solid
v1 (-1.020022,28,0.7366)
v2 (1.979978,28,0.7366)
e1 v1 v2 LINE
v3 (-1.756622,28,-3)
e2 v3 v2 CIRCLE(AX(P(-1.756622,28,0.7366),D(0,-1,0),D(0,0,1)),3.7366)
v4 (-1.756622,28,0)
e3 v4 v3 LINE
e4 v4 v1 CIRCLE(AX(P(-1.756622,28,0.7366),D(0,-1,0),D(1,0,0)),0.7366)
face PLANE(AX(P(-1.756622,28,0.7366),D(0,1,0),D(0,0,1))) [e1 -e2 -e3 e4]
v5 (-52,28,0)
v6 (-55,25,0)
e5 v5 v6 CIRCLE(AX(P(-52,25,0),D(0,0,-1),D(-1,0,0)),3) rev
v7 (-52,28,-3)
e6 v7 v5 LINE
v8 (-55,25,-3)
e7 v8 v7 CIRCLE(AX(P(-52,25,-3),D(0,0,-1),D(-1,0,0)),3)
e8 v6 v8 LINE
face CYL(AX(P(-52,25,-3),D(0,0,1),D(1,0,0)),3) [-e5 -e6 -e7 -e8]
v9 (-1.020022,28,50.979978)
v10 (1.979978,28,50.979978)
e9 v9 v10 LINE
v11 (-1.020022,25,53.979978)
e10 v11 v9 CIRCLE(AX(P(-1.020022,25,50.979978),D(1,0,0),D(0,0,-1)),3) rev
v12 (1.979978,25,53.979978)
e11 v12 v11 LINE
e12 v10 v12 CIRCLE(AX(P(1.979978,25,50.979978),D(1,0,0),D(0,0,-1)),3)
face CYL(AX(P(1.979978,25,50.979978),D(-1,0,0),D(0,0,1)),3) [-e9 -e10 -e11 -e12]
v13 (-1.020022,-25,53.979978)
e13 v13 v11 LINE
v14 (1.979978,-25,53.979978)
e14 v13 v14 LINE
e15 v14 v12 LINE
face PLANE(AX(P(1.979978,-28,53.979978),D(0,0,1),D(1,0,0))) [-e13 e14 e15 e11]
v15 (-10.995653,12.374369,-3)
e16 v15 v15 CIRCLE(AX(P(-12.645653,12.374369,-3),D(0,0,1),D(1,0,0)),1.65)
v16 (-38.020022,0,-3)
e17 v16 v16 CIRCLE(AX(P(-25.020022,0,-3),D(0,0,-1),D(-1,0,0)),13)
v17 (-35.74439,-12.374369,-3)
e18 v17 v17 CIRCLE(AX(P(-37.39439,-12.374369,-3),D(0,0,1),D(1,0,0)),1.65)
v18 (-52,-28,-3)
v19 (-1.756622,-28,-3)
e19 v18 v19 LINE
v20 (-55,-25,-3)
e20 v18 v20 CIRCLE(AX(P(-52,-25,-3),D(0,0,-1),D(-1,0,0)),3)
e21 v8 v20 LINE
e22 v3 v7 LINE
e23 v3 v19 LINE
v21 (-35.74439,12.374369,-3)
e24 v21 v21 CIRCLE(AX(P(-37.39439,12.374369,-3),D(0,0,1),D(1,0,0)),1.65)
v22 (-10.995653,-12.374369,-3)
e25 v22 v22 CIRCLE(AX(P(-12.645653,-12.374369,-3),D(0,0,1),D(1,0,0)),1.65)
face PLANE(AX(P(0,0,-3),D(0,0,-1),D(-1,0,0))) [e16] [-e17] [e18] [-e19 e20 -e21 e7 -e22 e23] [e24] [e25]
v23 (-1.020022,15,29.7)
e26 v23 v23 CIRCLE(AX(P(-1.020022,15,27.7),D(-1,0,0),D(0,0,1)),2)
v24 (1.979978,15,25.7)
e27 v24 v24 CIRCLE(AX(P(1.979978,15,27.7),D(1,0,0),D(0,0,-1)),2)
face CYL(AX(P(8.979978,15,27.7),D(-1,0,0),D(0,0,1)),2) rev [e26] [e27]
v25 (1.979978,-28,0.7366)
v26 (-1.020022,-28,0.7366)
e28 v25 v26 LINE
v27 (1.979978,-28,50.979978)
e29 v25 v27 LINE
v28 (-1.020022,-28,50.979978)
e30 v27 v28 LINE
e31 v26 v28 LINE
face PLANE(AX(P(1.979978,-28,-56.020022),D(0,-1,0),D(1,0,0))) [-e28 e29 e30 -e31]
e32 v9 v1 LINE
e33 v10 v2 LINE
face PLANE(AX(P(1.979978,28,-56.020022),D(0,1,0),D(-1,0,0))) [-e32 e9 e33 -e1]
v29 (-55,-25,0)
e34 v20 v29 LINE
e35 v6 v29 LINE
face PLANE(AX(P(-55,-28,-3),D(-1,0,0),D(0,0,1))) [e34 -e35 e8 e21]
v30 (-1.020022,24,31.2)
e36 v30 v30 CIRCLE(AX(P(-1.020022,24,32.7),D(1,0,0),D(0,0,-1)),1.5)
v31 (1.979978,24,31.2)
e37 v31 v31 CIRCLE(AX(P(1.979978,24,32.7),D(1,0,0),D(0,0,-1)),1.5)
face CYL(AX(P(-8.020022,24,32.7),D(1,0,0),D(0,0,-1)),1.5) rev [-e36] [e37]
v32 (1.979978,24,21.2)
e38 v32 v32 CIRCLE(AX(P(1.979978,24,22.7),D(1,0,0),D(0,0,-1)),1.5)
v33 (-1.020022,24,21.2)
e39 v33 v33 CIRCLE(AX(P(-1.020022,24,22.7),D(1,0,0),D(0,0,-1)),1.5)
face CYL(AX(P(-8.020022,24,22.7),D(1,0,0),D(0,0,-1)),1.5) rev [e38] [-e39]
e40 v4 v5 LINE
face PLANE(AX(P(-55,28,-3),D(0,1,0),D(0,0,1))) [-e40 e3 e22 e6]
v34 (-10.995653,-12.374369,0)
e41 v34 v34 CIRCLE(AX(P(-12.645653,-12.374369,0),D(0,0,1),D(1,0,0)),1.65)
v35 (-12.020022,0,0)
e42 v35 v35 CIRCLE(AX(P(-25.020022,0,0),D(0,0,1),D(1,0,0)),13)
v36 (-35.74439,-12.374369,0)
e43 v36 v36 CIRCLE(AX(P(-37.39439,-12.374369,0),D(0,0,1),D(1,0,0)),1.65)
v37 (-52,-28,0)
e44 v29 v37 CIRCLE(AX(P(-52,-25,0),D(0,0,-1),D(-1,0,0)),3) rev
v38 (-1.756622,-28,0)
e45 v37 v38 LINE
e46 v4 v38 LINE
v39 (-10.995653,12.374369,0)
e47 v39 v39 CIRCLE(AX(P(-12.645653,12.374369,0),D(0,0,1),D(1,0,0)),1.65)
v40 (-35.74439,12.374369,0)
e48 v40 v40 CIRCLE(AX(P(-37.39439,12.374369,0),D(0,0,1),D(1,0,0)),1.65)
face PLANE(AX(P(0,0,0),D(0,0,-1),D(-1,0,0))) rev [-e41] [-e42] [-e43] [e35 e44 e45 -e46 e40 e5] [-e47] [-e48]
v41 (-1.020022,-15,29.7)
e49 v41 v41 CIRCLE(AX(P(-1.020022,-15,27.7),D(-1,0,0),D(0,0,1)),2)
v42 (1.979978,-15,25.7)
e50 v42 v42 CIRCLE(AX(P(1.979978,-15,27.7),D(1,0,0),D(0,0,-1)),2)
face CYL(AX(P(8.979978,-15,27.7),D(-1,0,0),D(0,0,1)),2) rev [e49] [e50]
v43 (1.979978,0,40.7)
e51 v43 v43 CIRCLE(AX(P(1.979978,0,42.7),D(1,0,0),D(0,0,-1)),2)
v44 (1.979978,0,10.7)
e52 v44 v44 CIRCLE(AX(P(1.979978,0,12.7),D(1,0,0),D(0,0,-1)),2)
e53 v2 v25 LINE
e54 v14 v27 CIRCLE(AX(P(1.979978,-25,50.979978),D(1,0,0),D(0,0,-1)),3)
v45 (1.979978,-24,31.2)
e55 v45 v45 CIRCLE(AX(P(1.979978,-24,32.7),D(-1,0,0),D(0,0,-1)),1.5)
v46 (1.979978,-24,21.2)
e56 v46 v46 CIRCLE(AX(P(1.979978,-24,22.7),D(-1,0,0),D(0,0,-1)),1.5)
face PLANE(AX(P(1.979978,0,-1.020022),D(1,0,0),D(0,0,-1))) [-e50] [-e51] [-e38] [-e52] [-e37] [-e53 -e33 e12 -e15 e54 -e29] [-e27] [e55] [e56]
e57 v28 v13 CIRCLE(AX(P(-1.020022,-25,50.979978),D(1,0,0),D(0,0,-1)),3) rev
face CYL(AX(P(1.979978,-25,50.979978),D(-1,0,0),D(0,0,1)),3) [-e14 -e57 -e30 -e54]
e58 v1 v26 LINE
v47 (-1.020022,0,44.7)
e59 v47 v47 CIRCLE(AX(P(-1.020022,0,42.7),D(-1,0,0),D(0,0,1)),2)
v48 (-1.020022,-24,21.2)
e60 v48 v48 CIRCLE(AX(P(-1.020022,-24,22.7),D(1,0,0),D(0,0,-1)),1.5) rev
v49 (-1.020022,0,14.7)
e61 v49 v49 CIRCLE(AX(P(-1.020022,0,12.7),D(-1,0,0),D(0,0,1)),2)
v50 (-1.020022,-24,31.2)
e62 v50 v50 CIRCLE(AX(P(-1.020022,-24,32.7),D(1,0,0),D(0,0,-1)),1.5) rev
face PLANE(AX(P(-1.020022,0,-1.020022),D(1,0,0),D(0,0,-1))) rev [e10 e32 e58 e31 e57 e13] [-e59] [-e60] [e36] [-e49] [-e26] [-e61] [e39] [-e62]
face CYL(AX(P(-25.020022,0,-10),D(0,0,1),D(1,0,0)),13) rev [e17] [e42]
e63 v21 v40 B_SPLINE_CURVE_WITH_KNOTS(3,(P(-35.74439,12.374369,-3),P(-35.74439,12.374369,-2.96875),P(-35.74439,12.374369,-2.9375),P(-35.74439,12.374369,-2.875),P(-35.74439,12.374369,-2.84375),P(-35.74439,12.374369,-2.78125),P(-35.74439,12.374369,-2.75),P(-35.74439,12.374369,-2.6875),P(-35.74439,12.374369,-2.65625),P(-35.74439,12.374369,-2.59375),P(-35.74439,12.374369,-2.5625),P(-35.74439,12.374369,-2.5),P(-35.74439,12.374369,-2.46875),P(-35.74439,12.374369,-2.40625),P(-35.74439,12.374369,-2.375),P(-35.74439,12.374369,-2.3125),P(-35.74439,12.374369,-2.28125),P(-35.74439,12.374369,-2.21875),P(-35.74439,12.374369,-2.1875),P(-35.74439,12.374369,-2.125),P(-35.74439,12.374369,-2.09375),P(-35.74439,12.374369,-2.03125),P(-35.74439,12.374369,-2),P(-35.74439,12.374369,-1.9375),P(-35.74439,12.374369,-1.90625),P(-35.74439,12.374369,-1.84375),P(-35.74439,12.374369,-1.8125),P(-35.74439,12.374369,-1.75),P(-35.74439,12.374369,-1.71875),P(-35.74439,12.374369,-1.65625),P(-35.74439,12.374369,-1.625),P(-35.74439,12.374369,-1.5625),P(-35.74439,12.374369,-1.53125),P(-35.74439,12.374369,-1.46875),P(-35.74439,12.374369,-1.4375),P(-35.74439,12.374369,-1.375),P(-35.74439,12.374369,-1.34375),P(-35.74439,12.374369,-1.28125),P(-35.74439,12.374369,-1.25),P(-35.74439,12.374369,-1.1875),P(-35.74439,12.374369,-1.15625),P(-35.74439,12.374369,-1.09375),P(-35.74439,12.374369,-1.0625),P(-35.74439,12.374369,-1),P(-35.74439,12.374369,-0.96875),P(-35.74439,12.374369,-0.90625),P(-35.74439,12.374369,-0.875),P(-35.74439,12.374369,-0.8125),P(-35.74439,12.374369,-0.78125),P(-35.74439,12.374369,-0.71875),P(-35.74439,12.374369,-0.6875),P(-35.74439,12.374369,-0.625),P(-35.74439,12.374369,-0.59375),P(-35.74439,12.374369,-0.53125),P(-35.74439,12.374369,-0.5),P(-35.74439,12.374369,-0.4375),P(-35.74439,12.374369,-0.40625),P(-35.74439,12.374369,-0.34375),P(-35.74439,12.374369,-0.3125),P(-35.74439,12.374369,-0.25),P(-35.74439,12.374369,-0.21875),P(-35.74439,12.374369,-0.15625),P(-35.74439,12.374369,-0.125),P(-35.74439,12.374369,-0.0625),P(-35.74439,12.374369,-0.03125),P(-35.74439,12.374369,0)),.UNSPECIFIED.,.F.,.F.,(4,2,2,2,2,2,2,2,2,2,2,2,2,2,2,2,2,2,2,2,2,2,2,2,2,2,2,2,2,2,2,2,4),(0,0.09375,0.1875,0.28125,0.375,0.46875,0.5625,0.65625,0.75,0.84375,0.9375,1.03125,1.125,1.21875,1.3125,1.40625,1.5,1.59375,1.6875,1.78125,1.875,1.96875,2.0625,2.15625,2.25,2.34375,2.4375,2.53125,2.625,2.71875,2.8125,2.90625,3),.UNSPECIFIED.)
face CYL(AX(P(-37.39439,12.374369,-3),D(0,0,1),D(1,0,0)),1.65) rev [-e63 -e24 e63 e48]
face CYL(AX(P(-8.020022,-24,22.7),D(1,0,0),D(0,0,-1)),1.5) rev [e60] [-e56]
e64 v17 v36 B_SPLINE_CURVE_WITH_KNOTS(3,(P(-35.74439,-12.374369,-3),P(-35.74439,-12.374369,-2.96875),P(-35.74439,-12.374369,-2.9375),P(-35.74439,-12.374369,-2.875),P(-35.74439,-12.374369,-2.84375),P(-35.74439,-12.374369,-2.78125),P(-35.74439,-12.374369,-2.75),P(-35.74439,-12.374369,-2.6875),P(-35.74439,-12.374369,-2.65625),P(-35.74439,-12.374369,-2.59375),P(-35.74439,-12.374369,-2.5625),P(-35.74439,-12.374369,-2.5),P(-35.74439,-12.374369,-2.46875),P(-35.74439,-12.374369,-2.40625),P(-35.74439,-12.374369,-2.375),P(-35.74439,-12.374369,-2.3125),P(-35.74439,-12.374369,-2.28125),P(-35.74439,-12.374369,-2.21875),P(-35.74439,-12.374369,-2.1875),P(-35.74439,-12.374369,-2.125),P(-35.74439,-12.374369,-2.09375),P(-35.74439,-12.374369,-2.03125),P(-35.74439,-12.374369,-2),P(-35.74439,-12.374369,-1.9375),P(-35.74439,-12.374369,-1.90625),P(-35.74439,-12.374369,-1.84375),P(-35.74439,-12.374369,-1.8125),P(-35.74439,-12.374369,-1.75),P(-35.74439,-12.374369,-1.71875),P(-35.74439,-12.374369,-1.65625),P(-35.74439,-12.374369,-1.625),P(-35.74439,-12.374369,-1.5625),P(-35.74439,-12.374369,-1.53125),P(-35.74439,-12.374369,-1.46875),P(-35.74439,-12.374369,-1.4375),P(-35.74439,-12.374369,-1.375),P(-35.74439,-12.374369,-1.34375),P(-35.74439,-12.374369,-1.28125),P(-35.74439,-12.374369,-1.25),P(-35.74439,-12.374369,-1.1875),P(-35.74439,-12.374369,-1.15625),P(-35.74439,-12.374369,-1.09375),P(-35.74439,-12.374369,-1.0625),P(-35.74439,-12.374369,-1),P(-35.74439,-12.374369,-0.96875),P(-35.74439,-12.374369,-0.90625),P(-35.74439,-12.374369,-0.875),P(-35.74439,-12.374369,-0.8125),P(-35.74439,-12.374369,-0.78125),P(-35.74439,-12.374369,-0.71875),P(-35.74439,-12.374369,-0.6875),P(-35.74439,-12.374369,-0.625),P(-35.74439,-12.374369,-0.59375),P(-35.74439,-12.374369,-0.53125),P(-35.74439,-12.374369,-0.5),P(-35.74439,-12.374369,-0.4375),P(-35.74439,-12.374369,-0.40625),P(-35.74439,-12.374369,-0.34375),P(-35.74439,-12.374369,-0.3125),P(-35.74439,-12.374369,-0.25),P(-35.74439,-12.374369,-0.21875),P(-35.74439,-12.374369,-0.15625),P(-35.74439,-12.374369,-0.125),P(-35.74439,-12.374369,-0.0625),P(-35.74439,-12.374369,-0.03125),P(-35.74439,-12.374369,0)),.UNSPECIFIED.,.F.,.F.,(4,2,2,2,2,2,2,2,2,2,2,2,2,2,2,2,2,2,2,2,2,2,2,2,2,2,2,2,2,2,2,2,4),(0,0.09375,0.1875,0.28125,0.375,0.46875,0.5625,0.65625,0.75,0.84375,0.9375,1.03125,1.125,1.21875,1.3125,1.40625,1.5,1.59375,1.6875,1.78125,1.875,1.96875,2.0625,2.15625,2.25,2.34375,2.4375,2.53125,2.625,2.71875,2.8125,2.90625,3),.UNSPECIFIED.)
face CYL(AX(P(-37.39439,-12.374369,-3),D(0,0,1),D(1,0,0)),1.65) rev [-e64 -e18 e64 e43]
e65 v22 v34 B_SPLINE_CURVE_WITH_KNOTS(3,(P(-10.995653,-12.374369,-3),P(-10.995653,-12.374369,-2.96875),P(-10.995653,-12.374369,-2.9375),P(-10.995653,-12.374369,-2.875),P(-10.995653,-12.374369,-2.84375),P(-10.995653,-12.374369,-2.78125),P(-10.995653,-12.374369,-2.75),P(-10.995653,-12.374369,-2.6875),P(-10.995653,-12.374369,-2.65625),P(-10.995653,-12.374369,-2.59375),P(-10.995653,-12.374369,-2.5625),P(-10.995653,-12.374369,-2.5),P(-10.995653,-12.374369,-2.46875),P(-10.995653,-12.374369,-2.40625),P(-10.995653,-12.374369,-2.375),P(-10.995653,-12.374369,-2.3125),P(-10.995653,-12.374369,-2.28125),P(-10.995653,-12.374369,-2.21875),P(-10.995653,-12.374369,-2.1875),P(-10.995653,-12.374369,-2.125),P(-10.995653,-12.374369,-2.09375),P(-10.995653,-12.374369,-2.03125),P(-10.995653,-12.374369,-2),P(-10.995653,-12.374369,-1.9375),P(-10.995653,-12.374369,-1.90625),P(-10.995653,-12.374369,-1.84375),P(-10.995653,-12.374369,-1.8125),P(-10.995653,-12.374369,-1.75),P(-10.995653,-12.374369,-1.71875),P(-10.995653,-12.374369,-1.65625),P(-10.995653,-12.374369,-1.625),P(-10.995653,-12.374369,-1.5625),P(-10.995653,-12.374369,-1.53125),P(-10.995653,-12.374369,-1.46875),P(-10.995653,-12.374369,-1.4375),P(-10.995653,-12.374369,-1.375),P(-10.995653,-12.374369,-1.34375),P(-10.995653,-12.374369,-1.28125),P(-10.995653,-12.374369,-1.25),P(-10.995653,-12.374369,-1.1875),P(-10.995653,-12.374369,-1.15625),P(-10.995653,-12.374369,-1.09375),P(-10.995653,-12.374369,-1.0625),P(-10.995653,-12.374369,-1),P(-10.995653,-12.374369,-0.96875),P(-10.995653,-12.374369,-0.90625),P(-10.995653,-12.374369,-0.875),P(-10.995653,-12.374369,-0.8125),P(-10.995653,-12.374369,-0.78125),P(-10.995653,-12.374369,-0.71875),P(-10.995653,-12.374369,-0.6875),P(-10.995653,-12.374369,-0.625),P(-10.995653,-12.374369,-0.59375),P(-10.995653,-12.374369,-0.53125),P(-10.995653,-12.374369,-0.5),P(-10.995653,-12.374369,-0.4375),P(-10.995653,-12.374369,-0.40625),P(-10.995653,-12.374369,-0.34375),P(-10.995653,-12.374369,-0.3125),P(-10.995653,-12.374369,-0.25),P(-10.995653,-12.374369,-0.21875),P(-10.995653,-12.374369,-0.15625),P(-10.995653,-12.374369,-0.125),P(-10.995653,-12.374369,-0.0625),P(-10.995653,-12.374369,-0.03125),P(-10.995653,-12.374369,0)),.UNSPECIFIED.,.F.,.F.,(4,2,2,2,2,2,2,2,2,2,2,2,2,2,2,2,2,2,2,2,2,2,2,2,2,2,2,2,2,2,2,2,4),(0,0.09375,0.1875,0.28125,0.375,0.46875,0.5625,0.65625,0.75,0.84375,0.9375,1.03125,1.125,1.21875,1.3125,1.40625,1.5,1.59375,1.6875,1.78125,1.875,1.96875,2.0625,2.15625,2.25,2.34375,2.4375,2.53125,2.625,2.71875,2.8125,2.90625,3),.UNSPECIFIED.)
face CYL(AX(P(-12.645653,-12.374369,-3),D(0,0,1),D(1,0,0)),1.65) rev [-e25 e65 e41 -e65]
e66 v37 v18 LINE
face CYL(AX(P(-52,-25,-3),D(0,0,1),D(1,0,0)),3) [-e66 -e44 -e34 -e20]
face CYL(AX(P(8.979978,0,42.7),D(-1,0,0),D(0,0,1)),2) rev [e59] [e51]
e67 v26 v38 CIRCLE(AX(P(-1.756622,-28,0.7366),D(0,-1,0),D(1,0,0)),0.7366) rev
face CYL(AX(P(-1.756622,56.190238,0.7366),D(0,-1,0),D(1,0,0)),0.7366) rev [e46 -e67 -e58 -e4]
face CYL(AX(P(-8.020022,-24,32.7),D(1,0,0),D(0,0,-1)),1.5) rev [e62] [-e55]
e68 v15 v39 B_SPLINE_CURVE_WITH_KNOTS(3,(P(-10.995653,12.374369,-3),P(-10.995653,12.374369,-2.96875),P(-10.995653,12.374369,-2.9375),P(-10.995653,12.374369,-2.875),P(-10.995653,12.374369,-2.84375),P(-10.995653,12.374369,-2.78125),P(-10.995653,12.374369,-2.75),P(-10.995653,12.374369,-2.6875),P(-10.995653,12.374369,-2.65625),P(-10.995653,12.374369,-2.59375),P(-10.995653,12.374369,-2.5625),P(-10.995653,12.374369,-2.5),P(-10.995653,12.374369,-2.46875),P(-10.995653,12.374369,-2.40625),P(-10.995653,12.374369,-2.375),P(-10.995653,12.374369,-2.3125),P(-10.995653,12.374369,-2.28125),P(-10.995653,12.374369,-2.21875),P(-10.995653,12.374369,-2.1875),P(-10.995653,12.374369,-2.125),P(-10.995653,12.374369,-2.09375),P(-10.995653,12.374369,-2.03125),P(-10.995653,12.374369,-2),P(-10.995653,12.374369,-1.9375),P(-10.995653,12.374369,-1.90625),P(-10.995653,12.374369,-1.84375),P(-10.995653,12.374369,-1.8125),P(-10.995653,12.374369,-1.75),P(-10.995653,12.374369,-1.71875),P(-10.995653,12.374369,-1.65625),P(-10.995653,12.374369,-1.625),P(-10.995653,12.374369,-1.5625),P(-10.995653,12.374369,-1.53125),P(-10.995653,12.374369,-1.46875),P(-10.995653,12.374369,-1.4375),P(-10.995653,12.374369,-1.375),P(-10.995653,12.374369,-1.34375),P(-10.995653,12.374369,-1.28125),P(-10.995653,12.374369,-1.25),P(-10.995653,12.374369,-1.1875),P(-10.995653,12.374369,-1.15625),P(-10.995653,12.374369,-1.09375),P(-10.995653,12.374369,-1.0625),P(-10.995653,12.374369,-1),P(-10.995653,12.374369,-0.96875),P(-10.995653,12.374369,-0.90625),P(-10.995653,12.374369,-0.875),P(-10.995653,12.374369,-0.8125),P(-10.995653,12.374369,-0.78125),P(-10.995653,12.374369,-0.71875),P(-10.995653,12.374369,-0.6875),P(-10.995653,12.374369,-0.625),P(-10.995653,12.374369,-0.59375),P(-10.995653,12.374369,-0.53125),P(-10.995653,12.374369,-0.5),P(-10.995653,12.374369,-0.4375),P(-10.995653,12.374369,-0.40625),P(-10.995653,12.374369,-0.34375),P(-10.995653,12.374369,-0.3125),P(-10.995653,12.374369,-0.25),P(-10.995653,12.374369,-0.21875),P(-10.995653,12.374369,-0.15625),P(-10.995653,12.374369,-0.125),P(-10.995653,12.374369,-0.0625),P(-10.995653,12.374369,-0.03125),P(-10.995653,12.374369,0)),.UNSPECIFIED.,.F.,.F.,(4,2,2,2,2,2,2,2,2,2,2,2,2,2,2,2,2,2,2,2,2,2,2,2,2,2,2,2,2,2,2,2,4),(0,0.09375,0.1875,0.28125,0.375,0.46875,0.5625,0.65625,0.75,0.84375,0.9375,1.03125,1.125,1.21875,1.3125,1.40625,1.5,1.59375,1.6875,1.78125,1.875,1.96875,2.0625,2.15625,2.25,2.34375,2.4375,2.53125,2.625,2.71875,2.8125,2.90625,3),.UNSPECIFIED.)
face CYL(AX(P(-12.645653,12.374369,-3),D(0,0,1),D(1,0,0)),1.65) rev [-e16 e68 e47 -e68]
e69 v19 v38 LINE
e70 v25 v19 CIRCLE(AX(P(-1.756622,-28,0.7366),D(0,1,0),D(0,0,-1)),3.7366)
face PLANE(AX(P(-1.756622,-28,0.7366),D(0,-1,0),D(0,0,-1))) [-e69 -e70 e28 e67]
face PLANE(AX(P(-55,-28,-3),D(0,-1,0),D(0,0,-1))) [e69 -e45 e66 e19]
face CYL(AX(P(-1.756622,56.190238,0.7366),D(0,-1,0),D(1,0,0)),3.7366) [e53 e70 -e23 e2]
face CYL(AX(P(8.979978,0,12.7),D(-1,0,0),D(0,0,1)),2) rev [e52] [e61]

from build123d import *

# Parameters (mm, degrees)
SKETCH_2_W             = 110
SKETCH_2_H             = 56
SM_BASE_FLANGE_1_DEPTH = 3
OTHER_START            = -28
OTHER_1_DEPTH          = 56
OTHER_1_2_DEPTH        = 56
SKETCH_8_R             = 2
CUT_EXTRUDE_1_DEPTH    = 10
FILLET_1_R             = 3
SKETCH_9_R             = 13
CUT_EXTRUDE_2_DEPTH    = 10
SKETCH_10_R            = 1.65
CUT_EXTRUDE_3_DEPTH    = 82.992914788
SKETCH_11_R            = 1.5
CUT_EXTRUDE_4_DEPTH    = 10


# Read off the part's stored shape, not the designer's step: 绘制的折弯1
# Sheet-metal steps are written as plain solids
with BuildPart() as part:
    # Sketch 2 → 基体-法兰1 (new body)
    with BuildSketch(Plane.XY):
        Rectangle(SKETCH_2_W, SKETCH_2_H)
    extrude(amount=-SM_BASE_FLANGE_1_DEPTH)

    # Other 1 outline → Other 1 (cut)
    with BuildSketch(Plane(origin=(0, 0, 0), x_dir=(1, 0, 0), z_dir=(0, 1, 0)).offset(OTHER_START)):
        with BuildLine():
            ThreePointArc((-1.756621532, 3), (0.610845469, 2.154295979), (1.906655689, 0))
            Line((1.906655689, 0), (55, 0))
            Line((55, 0), (55, 3))
            Line((55, 3), (-1.756621532, 3))
        make_face()
    extrude(amount=OTHER_1_DEPTH, mode=Mode.SUBTRACT)

    # Other 1 2 outline → Other 1 2 (add)
    with BuildSketch(Plane(origin=(0, 0, 0), x_dir=(1, 0, 0), z_dir=(0, 1, 0)).offset(OTHER_START)):
        with BuildLine():
            Line((-1.020021532, -0.7366), (-1.020021532, -53.979978468))
            Line((-1.020021532, -53.979978468), (1.979978468, -53.979978468))
            Line((1.979978468, -53.979978468), (1.979978468, -0.7366))
            ThreePointArc((1.979978468, -0.7366), (1.961602589, -0.36647982), (1.906655689, 0))
            Line((1.906655689, 0), (-1.756621532, 0))
            ThreePointArc((-1.756621532, 0), (-1.235766677, -0.215745145), (-1.020021532, -0.7366))
        make_face()
    extrude(amount=OTHER_1_2_DEPTH)

    # 草图8 → 切除-拉伸1 (cut)
    with BuildSketch(Plane.ZY.offset(1.020021532)):
        with Locations((12.7, 0)):
            Circle(SKETCH_8_R)
        with Locations((42.7, 0)):
            Circle(SKETCH_8_R)
        with Locations((27.7, 15)):
            Circle(SKETCH_8_R)
        with Locations((27.7, -15)):
            Circle(SKETCH_8_R)
    extrude(amount=-CUT_EXTRUDE_1_DEPTH, mode=Mode.SUBTRACT)

    # 圆角1
    fillet_1_edges = [part.edges().sort_by_distance(p)[0] for p in [
        (-55, -28, -1.5),
        (-55, 28, -1.5),
        (0.479978468, -28, 53.979978468),
        (0.479978468, 28, 53.979978468),
    ]]
    fillet(fillet_1_edges, radius=FILLET_1_R)

    # 草图9 → 切除-拉伸2 (cut)
    with BuildSketch(Plane.XY):
        with Locations((-25.020021532, 0)):
            Circle(SKETCH_9_R)
    extrude(amount=-CUT_EXTRUDE_2_DEPTH, mode=Mode.SUBTRACT)

    # 草图10 → 切除-拉伸3 (cut, through all)
    with BuildSketch(Plane.XY):
        with Locations((-12.645652861, 12.374368671)):
            Circle(SKETCH_10_R)
        with Locations((-12.645652861, -12.374368671)):
            Circle(SKETCH_10_R)
        with Locations((-37.394390203, -12.374368671)):
            Circle(SKETCH_10_R)
        with Locations((-37.394390203, 12.374368671)):
            Circle(SKETCH_10_R)
    extrude(amount=-CUT_EXTRUDE_3_DEPTH, mode=Mode.SUBTRACT)

    # 草图11 → 切除-拉伸4 (cut)
    with BuildSketch(Plane(origin=(1.979978468, 0, 0), x_dir=(0, 0, -1), z_dir=(1, 0, 0))):
        with Locations((-32.7, 24)):
            Circle(SKETCH_11_R)
        with Locations((-22.7, 24)):
            Circle(SKETCH_11_R)
    cut_extrude_4 = extrude(amount=-CUT_EXTRUDE_4_DEPTH, mode=Mode.SUBTRACT)

    # 镜向1: 切除-拉伸4 across plane
    add(cut_extrude_4.mirror(Plane.ZX), mode=Mode.SUBTRACT)


solid = part.part
